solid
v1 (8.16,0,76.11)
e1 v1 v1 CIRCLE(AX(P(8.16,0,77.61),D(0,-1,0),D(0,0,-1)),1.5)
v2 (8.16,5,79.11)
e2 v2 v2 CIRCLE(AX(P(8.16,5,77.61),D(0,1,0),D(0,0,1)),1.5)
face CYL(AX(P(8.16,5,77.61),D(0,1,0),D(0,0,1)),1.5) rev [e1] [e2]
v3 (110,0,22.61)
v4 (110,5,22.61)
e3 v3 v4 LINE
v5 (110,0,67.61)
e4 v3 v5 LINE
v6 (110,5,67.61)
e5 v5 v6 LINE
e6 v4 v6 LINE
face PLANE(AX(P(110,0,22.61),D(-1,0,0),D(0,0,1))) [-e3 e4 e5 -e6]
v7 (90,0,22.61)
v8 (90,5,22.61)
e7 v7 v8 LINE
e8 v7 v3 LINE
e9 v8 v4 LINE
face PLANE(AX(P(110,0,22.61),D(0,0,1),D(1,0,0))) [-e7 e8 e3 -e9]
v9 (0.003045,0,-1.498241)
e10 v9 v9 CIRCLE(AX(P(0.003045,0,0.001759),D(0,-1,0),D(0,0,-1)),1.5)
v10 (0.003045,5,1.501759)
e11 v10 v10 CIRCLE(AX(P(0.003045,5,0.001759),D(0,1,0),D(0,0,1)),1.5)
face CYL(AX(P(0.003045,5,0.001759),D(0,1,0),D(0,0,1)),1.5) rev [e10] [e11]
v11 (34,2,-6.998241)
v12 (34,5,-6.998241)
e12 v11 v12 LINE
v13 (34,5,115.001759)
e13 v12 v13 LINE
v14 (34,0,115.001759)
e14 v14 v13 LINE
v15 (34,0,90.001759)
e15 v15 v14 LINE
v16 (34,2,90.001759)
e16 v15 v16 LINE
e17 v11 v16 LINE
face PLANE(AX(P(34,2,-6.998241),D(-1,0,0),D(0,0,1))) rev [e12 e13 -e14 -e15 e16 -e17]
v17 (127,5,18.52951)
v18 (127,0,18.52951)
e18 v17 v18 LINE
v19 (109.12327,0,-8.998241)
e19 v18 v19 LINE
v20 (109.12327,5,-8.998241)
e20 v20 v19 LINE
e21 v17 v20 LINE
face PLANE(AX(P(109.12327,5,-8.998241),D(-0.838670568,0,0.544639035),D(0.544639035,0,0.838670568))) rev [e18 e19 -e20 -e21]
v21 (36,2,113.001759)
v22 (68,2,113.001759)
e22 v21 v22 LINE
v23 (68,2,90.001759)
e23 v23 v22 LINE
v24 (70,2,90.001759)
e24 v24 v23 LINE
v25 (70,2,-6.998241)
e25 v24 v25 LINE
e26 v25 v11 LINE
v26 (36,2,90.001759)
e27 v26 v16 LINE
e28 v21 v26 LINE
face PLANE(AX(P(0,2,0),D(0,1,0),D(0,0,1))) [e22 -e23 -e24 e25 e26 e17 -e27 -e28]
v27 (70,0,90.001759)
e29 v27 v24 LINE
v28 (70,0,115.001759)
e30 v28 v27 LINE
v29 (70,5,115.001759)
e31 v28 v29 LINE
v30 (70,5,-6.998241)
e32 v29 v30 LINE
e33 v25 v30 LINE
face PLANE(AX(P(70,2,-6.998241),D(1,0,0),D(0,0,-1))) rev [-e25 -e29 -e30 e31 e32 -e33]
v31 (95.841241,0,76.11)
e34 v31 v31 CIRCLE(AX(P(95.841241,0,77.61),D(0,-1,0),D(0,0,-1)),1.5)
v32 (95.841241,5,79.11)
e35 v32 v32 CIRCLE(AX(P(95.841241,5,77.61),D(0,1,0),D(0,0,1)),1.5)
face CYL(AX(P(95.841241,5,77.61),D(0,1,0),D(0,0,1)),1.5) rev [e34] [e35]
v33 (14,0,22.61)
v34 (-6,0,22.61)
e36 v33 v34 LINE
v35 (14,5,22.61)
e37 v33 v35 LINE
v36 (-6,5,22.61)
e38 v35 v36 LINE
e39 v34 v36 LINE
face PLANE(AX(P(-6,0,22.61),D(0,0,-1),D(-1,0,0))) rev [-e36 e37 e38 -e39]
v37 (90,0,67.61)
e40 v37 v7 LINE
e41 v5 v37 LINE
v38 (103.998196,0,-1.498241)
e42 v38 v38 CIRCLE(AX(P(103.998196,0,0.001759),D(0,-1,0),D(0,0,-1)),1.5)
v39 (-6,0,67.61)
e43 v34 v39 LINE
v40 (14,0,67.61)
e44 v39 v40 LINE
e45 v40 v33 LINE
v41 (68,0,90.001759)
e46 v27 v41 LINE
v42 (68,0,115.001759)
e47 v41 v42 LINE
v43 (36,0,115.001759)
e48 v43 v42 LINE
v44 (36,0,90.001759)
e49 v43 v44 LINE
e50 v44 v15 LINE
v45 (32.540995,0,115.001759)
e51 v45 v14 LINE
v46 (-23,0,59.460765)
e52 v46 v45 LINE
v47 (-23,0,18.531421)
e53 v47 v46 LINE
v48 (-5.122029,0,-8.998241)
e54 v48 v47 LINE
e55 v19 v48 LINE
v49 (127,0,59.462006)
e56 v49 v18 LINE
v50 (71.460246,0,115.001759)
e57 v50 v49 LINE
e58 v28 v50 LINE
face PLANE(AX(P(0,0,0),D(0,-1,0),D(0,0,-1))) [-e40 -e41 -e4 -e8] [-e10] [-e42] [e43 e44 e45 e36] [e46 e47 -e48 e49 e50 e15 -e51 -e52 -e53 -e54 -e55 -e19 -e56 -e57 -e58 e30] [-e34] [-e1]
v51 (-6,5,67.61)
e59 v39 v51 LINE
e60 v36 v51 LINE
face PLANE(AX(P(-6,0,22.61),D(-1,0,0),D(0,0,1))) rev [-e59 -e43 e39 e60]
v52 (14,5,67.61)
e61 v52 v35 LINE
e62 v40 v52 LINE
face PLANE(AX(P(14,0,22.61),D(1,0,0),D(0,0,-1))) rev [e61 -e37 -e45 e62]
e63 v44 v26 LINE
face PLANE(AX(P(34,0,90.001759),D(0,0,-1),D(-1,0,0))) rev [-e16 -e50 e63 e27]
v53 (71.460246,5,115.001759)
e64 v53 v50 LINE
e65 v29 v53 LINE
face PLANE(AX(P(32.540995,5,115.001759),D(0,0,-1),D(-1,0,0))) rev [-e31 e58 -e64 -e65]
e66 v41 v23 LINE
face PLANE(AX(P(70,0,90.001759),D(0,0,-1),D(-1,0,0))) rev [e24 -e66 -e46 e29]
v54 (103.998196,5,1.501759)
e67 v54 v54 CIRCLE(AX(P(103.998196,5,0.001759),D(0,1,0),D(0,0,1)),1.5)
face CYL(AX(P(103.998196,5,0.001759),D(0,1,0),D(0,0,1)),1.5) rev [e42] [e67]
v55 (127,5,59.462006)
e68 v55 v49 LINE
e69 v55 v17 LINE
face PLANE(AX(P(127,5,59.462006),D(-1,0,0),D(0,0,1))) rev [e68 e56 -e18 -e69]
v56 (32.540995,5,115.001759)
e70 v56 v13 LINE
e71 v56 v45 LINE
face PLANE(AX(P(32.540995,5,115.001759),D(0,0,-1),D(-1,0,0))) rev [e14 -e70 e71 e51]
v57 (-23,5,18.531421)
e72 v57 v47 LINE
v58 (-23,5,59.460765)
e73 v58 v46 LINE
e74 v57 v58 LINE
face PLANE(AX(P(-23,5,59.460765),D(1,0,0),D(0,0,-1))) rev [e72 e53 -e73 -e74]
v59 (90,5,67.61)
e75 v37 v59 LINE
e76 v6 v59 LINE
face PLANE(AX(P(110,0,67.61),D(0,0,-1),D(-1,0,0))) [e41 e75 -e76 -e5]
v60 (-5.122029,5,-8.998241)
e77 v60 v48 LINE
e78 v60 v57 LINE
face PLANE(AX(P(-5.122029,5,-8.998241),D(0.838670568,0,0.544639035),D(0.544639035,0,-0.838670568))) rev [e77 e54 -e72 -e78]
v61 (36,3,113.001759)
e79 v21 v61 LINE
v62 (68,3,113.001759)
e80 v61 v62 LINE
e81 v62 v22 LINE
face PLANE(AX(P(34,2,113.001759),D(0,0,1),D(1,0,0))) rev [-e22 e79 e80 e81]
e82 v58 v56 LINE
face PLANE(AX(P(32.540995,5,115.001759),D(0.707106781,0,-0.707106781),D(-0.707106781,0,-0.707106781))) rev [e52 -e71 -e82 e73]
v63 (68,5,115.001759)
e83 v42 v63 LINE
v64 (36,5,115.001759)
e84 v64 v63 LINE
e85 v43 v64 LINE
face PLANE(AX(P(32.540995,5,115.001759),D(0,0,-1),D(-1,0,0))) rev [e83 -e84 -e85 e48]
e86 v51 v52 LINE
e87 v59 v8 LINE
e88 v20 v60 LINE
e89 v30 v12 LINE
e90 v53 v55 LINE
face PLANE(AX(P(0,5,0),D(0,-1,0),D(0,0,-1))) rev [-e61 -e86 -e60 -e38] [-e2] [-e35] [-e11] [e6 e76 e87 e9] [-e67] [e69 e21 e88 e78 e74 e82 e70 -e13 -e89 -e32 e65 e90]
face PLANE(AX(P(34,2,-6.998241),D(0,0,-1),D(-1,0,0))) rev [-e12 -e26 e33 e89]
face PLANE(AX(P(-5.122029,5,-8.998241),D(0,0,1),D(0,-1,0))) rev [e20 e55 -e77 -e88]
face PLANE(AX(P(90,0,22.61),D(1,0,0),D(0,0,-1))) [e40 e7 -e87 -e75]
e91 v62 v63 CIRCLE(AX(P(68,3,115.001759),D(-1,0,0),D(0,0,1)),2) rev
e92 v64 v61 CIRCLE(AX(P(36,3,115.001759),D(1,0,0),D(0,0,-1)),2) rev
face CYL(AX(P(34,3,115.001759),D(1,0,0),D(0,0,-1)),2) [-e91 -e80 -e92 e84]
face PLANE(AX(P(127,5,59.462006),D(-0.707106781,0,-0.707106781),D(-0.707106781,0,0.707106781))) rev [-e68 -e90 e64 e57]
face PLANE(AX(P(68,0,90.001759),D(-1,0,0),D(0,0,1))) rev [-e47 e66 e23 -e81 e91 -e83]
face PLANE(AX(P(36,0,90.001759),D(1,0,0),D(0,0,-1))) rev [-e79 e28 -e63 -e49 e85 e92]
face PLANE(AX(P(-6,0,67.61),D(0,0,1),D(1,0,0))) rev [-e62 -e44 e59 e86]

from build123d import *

# Parameters (mm, degrees)
BOSS_EXTRUDE1_DEPTH          = 5
F_3_0_3_DIAMETER_HOLE1_D     = 3
F_3_0_3_DIAMETER_HOLE1_DEPTH = 6
F_3_0_3_DIAMETER_HOLE1_TIP   = 0.901290929
SKETCH6_W                    = 36
SKETCH6_H                    = 120
CUT_EXTRUDE1_DEPTH           = 3
SKETCH9_W                    = 20
SKETCH9_H                    = 45
CUT_EXTRUDE3_DEPTH           = 172.404214254
SKETCH10_W                   = 2
SKETCH10_H                   = 25
CUT_EXTRUDE4_DEPTH           = 172.404214254
FILLET3_R                    = 2


with BuildPart() as part:
    # Sketch3 → Boss-Extrude1 (new body)
    with BuildSketch(Plane(origin=(0, 0, 0), x_dir=(1, 0, 0), z_dir=(0, 1, 0))):
        Polygon((32.540994622, -115.001759396), (71.460246245, -115.001759396), (127, -59.462005641), (127, -18.529510204), (109.123269601, 8.998240604), (-5.122028734, 8.998240604), (-23, -18.531420972), (-23, -59.460764774), align=None)
    extrude(amount=BOSS_EXTRUDE1_DEPTH)

    # Ø3.0 (3) Diameter Hole1
    with Locations(Plane(origin=(0, 5, 0), x_dir=(1, 0, 0), z_dir=(0, 1, 0))):
        with Locations((95.841240867, -77.61), (8.16, -77.61), (103.998195646, -0.001759396), (0.003045221, -0.001759396)):
            Hole(F_3_0_3_DIAMETER_HOLE1_D / 2, depth=F_3_0_3_DIAMETER_HOLE1_DEPTH)
            with Locations((0, 0, -(F_3_0_3_DIAMETER_HOLE1_DEPTH + F_3_0_3_DIAMETER_HOLE1_TIP / 2))):  # 118° drill point
                Cone(0, F_3_0_3_DIAMETER_HOLE1_D / 2, F_3_0_3_DIAMETER_HOLE1_TIP, mode=Mode.SUBTRACT)

    # Sketch6 → Cut-Extrude1 (cut)
    with BuildSketch(Plane(origin=(0, 5, 0), x_dir=(1, 0, 0), z_dir=(0, 1, 0))):
        with Locations((52, -53.001759396)):
            Rectangle(SKETCH6_W, SKETCH6_H)
    extrude(amount=-CUT_EXTRUDE1_DEPTH, mode=Mode.SUBTRACT)

    # Sketch9 → Cut-Extrude3 (cut, through all)
    with BuildSketch(Plane(origin=(0, 5, 0), x_dir=(1, 0, 0), z_dir=(0, 1, 0))):
        with Locations((4, -45.11)):
            Rectangle(SKETCH9_W, SKETCH9_H)
    cut_extrude3 = extrude(amount=-CUT_EXTRUDE3_DEPTH, mode=Mode.SUBTRACT)

    # Mirror1: Cut-Extrude3 across plane
    add(cut_extrude3.mirror(Plane(origin=(52, 0, 0), x_dir=(0, 0, 1), z_dir=(1, 0, 0))), mode=Mode.SUBTRACT)

    # Sketch10 → Cut-Extrude4 (cut, through all)
    with BuildSketch(Plane(origin=(0, 5, 0), x_dir=(1, 0, 0), z_dir=(0, 1, 0))):
        with Locations((35, -102.501759396)):
            Rectangle(SKETCH10_W, SKETCH10_H)
        with Locations((69, -102.501759396)):
            Rectangle(SKETCH10_W, SKETCH10_H)
    extrude(amount=-CUT_EXTRUDE4_DEPTH, mode=Mode.SUBTRACT)

    # Fillet3
    fillet3_edges = [part.edges().sort_by_distance(p)[0] for p in [
        (52, 5, 113.001759396),
    ]]
    fillet(fillet3_edges, radius=FILLET3_R - 0.0001)  # a hair under: the kernel refuses the full size


solid = part.part
